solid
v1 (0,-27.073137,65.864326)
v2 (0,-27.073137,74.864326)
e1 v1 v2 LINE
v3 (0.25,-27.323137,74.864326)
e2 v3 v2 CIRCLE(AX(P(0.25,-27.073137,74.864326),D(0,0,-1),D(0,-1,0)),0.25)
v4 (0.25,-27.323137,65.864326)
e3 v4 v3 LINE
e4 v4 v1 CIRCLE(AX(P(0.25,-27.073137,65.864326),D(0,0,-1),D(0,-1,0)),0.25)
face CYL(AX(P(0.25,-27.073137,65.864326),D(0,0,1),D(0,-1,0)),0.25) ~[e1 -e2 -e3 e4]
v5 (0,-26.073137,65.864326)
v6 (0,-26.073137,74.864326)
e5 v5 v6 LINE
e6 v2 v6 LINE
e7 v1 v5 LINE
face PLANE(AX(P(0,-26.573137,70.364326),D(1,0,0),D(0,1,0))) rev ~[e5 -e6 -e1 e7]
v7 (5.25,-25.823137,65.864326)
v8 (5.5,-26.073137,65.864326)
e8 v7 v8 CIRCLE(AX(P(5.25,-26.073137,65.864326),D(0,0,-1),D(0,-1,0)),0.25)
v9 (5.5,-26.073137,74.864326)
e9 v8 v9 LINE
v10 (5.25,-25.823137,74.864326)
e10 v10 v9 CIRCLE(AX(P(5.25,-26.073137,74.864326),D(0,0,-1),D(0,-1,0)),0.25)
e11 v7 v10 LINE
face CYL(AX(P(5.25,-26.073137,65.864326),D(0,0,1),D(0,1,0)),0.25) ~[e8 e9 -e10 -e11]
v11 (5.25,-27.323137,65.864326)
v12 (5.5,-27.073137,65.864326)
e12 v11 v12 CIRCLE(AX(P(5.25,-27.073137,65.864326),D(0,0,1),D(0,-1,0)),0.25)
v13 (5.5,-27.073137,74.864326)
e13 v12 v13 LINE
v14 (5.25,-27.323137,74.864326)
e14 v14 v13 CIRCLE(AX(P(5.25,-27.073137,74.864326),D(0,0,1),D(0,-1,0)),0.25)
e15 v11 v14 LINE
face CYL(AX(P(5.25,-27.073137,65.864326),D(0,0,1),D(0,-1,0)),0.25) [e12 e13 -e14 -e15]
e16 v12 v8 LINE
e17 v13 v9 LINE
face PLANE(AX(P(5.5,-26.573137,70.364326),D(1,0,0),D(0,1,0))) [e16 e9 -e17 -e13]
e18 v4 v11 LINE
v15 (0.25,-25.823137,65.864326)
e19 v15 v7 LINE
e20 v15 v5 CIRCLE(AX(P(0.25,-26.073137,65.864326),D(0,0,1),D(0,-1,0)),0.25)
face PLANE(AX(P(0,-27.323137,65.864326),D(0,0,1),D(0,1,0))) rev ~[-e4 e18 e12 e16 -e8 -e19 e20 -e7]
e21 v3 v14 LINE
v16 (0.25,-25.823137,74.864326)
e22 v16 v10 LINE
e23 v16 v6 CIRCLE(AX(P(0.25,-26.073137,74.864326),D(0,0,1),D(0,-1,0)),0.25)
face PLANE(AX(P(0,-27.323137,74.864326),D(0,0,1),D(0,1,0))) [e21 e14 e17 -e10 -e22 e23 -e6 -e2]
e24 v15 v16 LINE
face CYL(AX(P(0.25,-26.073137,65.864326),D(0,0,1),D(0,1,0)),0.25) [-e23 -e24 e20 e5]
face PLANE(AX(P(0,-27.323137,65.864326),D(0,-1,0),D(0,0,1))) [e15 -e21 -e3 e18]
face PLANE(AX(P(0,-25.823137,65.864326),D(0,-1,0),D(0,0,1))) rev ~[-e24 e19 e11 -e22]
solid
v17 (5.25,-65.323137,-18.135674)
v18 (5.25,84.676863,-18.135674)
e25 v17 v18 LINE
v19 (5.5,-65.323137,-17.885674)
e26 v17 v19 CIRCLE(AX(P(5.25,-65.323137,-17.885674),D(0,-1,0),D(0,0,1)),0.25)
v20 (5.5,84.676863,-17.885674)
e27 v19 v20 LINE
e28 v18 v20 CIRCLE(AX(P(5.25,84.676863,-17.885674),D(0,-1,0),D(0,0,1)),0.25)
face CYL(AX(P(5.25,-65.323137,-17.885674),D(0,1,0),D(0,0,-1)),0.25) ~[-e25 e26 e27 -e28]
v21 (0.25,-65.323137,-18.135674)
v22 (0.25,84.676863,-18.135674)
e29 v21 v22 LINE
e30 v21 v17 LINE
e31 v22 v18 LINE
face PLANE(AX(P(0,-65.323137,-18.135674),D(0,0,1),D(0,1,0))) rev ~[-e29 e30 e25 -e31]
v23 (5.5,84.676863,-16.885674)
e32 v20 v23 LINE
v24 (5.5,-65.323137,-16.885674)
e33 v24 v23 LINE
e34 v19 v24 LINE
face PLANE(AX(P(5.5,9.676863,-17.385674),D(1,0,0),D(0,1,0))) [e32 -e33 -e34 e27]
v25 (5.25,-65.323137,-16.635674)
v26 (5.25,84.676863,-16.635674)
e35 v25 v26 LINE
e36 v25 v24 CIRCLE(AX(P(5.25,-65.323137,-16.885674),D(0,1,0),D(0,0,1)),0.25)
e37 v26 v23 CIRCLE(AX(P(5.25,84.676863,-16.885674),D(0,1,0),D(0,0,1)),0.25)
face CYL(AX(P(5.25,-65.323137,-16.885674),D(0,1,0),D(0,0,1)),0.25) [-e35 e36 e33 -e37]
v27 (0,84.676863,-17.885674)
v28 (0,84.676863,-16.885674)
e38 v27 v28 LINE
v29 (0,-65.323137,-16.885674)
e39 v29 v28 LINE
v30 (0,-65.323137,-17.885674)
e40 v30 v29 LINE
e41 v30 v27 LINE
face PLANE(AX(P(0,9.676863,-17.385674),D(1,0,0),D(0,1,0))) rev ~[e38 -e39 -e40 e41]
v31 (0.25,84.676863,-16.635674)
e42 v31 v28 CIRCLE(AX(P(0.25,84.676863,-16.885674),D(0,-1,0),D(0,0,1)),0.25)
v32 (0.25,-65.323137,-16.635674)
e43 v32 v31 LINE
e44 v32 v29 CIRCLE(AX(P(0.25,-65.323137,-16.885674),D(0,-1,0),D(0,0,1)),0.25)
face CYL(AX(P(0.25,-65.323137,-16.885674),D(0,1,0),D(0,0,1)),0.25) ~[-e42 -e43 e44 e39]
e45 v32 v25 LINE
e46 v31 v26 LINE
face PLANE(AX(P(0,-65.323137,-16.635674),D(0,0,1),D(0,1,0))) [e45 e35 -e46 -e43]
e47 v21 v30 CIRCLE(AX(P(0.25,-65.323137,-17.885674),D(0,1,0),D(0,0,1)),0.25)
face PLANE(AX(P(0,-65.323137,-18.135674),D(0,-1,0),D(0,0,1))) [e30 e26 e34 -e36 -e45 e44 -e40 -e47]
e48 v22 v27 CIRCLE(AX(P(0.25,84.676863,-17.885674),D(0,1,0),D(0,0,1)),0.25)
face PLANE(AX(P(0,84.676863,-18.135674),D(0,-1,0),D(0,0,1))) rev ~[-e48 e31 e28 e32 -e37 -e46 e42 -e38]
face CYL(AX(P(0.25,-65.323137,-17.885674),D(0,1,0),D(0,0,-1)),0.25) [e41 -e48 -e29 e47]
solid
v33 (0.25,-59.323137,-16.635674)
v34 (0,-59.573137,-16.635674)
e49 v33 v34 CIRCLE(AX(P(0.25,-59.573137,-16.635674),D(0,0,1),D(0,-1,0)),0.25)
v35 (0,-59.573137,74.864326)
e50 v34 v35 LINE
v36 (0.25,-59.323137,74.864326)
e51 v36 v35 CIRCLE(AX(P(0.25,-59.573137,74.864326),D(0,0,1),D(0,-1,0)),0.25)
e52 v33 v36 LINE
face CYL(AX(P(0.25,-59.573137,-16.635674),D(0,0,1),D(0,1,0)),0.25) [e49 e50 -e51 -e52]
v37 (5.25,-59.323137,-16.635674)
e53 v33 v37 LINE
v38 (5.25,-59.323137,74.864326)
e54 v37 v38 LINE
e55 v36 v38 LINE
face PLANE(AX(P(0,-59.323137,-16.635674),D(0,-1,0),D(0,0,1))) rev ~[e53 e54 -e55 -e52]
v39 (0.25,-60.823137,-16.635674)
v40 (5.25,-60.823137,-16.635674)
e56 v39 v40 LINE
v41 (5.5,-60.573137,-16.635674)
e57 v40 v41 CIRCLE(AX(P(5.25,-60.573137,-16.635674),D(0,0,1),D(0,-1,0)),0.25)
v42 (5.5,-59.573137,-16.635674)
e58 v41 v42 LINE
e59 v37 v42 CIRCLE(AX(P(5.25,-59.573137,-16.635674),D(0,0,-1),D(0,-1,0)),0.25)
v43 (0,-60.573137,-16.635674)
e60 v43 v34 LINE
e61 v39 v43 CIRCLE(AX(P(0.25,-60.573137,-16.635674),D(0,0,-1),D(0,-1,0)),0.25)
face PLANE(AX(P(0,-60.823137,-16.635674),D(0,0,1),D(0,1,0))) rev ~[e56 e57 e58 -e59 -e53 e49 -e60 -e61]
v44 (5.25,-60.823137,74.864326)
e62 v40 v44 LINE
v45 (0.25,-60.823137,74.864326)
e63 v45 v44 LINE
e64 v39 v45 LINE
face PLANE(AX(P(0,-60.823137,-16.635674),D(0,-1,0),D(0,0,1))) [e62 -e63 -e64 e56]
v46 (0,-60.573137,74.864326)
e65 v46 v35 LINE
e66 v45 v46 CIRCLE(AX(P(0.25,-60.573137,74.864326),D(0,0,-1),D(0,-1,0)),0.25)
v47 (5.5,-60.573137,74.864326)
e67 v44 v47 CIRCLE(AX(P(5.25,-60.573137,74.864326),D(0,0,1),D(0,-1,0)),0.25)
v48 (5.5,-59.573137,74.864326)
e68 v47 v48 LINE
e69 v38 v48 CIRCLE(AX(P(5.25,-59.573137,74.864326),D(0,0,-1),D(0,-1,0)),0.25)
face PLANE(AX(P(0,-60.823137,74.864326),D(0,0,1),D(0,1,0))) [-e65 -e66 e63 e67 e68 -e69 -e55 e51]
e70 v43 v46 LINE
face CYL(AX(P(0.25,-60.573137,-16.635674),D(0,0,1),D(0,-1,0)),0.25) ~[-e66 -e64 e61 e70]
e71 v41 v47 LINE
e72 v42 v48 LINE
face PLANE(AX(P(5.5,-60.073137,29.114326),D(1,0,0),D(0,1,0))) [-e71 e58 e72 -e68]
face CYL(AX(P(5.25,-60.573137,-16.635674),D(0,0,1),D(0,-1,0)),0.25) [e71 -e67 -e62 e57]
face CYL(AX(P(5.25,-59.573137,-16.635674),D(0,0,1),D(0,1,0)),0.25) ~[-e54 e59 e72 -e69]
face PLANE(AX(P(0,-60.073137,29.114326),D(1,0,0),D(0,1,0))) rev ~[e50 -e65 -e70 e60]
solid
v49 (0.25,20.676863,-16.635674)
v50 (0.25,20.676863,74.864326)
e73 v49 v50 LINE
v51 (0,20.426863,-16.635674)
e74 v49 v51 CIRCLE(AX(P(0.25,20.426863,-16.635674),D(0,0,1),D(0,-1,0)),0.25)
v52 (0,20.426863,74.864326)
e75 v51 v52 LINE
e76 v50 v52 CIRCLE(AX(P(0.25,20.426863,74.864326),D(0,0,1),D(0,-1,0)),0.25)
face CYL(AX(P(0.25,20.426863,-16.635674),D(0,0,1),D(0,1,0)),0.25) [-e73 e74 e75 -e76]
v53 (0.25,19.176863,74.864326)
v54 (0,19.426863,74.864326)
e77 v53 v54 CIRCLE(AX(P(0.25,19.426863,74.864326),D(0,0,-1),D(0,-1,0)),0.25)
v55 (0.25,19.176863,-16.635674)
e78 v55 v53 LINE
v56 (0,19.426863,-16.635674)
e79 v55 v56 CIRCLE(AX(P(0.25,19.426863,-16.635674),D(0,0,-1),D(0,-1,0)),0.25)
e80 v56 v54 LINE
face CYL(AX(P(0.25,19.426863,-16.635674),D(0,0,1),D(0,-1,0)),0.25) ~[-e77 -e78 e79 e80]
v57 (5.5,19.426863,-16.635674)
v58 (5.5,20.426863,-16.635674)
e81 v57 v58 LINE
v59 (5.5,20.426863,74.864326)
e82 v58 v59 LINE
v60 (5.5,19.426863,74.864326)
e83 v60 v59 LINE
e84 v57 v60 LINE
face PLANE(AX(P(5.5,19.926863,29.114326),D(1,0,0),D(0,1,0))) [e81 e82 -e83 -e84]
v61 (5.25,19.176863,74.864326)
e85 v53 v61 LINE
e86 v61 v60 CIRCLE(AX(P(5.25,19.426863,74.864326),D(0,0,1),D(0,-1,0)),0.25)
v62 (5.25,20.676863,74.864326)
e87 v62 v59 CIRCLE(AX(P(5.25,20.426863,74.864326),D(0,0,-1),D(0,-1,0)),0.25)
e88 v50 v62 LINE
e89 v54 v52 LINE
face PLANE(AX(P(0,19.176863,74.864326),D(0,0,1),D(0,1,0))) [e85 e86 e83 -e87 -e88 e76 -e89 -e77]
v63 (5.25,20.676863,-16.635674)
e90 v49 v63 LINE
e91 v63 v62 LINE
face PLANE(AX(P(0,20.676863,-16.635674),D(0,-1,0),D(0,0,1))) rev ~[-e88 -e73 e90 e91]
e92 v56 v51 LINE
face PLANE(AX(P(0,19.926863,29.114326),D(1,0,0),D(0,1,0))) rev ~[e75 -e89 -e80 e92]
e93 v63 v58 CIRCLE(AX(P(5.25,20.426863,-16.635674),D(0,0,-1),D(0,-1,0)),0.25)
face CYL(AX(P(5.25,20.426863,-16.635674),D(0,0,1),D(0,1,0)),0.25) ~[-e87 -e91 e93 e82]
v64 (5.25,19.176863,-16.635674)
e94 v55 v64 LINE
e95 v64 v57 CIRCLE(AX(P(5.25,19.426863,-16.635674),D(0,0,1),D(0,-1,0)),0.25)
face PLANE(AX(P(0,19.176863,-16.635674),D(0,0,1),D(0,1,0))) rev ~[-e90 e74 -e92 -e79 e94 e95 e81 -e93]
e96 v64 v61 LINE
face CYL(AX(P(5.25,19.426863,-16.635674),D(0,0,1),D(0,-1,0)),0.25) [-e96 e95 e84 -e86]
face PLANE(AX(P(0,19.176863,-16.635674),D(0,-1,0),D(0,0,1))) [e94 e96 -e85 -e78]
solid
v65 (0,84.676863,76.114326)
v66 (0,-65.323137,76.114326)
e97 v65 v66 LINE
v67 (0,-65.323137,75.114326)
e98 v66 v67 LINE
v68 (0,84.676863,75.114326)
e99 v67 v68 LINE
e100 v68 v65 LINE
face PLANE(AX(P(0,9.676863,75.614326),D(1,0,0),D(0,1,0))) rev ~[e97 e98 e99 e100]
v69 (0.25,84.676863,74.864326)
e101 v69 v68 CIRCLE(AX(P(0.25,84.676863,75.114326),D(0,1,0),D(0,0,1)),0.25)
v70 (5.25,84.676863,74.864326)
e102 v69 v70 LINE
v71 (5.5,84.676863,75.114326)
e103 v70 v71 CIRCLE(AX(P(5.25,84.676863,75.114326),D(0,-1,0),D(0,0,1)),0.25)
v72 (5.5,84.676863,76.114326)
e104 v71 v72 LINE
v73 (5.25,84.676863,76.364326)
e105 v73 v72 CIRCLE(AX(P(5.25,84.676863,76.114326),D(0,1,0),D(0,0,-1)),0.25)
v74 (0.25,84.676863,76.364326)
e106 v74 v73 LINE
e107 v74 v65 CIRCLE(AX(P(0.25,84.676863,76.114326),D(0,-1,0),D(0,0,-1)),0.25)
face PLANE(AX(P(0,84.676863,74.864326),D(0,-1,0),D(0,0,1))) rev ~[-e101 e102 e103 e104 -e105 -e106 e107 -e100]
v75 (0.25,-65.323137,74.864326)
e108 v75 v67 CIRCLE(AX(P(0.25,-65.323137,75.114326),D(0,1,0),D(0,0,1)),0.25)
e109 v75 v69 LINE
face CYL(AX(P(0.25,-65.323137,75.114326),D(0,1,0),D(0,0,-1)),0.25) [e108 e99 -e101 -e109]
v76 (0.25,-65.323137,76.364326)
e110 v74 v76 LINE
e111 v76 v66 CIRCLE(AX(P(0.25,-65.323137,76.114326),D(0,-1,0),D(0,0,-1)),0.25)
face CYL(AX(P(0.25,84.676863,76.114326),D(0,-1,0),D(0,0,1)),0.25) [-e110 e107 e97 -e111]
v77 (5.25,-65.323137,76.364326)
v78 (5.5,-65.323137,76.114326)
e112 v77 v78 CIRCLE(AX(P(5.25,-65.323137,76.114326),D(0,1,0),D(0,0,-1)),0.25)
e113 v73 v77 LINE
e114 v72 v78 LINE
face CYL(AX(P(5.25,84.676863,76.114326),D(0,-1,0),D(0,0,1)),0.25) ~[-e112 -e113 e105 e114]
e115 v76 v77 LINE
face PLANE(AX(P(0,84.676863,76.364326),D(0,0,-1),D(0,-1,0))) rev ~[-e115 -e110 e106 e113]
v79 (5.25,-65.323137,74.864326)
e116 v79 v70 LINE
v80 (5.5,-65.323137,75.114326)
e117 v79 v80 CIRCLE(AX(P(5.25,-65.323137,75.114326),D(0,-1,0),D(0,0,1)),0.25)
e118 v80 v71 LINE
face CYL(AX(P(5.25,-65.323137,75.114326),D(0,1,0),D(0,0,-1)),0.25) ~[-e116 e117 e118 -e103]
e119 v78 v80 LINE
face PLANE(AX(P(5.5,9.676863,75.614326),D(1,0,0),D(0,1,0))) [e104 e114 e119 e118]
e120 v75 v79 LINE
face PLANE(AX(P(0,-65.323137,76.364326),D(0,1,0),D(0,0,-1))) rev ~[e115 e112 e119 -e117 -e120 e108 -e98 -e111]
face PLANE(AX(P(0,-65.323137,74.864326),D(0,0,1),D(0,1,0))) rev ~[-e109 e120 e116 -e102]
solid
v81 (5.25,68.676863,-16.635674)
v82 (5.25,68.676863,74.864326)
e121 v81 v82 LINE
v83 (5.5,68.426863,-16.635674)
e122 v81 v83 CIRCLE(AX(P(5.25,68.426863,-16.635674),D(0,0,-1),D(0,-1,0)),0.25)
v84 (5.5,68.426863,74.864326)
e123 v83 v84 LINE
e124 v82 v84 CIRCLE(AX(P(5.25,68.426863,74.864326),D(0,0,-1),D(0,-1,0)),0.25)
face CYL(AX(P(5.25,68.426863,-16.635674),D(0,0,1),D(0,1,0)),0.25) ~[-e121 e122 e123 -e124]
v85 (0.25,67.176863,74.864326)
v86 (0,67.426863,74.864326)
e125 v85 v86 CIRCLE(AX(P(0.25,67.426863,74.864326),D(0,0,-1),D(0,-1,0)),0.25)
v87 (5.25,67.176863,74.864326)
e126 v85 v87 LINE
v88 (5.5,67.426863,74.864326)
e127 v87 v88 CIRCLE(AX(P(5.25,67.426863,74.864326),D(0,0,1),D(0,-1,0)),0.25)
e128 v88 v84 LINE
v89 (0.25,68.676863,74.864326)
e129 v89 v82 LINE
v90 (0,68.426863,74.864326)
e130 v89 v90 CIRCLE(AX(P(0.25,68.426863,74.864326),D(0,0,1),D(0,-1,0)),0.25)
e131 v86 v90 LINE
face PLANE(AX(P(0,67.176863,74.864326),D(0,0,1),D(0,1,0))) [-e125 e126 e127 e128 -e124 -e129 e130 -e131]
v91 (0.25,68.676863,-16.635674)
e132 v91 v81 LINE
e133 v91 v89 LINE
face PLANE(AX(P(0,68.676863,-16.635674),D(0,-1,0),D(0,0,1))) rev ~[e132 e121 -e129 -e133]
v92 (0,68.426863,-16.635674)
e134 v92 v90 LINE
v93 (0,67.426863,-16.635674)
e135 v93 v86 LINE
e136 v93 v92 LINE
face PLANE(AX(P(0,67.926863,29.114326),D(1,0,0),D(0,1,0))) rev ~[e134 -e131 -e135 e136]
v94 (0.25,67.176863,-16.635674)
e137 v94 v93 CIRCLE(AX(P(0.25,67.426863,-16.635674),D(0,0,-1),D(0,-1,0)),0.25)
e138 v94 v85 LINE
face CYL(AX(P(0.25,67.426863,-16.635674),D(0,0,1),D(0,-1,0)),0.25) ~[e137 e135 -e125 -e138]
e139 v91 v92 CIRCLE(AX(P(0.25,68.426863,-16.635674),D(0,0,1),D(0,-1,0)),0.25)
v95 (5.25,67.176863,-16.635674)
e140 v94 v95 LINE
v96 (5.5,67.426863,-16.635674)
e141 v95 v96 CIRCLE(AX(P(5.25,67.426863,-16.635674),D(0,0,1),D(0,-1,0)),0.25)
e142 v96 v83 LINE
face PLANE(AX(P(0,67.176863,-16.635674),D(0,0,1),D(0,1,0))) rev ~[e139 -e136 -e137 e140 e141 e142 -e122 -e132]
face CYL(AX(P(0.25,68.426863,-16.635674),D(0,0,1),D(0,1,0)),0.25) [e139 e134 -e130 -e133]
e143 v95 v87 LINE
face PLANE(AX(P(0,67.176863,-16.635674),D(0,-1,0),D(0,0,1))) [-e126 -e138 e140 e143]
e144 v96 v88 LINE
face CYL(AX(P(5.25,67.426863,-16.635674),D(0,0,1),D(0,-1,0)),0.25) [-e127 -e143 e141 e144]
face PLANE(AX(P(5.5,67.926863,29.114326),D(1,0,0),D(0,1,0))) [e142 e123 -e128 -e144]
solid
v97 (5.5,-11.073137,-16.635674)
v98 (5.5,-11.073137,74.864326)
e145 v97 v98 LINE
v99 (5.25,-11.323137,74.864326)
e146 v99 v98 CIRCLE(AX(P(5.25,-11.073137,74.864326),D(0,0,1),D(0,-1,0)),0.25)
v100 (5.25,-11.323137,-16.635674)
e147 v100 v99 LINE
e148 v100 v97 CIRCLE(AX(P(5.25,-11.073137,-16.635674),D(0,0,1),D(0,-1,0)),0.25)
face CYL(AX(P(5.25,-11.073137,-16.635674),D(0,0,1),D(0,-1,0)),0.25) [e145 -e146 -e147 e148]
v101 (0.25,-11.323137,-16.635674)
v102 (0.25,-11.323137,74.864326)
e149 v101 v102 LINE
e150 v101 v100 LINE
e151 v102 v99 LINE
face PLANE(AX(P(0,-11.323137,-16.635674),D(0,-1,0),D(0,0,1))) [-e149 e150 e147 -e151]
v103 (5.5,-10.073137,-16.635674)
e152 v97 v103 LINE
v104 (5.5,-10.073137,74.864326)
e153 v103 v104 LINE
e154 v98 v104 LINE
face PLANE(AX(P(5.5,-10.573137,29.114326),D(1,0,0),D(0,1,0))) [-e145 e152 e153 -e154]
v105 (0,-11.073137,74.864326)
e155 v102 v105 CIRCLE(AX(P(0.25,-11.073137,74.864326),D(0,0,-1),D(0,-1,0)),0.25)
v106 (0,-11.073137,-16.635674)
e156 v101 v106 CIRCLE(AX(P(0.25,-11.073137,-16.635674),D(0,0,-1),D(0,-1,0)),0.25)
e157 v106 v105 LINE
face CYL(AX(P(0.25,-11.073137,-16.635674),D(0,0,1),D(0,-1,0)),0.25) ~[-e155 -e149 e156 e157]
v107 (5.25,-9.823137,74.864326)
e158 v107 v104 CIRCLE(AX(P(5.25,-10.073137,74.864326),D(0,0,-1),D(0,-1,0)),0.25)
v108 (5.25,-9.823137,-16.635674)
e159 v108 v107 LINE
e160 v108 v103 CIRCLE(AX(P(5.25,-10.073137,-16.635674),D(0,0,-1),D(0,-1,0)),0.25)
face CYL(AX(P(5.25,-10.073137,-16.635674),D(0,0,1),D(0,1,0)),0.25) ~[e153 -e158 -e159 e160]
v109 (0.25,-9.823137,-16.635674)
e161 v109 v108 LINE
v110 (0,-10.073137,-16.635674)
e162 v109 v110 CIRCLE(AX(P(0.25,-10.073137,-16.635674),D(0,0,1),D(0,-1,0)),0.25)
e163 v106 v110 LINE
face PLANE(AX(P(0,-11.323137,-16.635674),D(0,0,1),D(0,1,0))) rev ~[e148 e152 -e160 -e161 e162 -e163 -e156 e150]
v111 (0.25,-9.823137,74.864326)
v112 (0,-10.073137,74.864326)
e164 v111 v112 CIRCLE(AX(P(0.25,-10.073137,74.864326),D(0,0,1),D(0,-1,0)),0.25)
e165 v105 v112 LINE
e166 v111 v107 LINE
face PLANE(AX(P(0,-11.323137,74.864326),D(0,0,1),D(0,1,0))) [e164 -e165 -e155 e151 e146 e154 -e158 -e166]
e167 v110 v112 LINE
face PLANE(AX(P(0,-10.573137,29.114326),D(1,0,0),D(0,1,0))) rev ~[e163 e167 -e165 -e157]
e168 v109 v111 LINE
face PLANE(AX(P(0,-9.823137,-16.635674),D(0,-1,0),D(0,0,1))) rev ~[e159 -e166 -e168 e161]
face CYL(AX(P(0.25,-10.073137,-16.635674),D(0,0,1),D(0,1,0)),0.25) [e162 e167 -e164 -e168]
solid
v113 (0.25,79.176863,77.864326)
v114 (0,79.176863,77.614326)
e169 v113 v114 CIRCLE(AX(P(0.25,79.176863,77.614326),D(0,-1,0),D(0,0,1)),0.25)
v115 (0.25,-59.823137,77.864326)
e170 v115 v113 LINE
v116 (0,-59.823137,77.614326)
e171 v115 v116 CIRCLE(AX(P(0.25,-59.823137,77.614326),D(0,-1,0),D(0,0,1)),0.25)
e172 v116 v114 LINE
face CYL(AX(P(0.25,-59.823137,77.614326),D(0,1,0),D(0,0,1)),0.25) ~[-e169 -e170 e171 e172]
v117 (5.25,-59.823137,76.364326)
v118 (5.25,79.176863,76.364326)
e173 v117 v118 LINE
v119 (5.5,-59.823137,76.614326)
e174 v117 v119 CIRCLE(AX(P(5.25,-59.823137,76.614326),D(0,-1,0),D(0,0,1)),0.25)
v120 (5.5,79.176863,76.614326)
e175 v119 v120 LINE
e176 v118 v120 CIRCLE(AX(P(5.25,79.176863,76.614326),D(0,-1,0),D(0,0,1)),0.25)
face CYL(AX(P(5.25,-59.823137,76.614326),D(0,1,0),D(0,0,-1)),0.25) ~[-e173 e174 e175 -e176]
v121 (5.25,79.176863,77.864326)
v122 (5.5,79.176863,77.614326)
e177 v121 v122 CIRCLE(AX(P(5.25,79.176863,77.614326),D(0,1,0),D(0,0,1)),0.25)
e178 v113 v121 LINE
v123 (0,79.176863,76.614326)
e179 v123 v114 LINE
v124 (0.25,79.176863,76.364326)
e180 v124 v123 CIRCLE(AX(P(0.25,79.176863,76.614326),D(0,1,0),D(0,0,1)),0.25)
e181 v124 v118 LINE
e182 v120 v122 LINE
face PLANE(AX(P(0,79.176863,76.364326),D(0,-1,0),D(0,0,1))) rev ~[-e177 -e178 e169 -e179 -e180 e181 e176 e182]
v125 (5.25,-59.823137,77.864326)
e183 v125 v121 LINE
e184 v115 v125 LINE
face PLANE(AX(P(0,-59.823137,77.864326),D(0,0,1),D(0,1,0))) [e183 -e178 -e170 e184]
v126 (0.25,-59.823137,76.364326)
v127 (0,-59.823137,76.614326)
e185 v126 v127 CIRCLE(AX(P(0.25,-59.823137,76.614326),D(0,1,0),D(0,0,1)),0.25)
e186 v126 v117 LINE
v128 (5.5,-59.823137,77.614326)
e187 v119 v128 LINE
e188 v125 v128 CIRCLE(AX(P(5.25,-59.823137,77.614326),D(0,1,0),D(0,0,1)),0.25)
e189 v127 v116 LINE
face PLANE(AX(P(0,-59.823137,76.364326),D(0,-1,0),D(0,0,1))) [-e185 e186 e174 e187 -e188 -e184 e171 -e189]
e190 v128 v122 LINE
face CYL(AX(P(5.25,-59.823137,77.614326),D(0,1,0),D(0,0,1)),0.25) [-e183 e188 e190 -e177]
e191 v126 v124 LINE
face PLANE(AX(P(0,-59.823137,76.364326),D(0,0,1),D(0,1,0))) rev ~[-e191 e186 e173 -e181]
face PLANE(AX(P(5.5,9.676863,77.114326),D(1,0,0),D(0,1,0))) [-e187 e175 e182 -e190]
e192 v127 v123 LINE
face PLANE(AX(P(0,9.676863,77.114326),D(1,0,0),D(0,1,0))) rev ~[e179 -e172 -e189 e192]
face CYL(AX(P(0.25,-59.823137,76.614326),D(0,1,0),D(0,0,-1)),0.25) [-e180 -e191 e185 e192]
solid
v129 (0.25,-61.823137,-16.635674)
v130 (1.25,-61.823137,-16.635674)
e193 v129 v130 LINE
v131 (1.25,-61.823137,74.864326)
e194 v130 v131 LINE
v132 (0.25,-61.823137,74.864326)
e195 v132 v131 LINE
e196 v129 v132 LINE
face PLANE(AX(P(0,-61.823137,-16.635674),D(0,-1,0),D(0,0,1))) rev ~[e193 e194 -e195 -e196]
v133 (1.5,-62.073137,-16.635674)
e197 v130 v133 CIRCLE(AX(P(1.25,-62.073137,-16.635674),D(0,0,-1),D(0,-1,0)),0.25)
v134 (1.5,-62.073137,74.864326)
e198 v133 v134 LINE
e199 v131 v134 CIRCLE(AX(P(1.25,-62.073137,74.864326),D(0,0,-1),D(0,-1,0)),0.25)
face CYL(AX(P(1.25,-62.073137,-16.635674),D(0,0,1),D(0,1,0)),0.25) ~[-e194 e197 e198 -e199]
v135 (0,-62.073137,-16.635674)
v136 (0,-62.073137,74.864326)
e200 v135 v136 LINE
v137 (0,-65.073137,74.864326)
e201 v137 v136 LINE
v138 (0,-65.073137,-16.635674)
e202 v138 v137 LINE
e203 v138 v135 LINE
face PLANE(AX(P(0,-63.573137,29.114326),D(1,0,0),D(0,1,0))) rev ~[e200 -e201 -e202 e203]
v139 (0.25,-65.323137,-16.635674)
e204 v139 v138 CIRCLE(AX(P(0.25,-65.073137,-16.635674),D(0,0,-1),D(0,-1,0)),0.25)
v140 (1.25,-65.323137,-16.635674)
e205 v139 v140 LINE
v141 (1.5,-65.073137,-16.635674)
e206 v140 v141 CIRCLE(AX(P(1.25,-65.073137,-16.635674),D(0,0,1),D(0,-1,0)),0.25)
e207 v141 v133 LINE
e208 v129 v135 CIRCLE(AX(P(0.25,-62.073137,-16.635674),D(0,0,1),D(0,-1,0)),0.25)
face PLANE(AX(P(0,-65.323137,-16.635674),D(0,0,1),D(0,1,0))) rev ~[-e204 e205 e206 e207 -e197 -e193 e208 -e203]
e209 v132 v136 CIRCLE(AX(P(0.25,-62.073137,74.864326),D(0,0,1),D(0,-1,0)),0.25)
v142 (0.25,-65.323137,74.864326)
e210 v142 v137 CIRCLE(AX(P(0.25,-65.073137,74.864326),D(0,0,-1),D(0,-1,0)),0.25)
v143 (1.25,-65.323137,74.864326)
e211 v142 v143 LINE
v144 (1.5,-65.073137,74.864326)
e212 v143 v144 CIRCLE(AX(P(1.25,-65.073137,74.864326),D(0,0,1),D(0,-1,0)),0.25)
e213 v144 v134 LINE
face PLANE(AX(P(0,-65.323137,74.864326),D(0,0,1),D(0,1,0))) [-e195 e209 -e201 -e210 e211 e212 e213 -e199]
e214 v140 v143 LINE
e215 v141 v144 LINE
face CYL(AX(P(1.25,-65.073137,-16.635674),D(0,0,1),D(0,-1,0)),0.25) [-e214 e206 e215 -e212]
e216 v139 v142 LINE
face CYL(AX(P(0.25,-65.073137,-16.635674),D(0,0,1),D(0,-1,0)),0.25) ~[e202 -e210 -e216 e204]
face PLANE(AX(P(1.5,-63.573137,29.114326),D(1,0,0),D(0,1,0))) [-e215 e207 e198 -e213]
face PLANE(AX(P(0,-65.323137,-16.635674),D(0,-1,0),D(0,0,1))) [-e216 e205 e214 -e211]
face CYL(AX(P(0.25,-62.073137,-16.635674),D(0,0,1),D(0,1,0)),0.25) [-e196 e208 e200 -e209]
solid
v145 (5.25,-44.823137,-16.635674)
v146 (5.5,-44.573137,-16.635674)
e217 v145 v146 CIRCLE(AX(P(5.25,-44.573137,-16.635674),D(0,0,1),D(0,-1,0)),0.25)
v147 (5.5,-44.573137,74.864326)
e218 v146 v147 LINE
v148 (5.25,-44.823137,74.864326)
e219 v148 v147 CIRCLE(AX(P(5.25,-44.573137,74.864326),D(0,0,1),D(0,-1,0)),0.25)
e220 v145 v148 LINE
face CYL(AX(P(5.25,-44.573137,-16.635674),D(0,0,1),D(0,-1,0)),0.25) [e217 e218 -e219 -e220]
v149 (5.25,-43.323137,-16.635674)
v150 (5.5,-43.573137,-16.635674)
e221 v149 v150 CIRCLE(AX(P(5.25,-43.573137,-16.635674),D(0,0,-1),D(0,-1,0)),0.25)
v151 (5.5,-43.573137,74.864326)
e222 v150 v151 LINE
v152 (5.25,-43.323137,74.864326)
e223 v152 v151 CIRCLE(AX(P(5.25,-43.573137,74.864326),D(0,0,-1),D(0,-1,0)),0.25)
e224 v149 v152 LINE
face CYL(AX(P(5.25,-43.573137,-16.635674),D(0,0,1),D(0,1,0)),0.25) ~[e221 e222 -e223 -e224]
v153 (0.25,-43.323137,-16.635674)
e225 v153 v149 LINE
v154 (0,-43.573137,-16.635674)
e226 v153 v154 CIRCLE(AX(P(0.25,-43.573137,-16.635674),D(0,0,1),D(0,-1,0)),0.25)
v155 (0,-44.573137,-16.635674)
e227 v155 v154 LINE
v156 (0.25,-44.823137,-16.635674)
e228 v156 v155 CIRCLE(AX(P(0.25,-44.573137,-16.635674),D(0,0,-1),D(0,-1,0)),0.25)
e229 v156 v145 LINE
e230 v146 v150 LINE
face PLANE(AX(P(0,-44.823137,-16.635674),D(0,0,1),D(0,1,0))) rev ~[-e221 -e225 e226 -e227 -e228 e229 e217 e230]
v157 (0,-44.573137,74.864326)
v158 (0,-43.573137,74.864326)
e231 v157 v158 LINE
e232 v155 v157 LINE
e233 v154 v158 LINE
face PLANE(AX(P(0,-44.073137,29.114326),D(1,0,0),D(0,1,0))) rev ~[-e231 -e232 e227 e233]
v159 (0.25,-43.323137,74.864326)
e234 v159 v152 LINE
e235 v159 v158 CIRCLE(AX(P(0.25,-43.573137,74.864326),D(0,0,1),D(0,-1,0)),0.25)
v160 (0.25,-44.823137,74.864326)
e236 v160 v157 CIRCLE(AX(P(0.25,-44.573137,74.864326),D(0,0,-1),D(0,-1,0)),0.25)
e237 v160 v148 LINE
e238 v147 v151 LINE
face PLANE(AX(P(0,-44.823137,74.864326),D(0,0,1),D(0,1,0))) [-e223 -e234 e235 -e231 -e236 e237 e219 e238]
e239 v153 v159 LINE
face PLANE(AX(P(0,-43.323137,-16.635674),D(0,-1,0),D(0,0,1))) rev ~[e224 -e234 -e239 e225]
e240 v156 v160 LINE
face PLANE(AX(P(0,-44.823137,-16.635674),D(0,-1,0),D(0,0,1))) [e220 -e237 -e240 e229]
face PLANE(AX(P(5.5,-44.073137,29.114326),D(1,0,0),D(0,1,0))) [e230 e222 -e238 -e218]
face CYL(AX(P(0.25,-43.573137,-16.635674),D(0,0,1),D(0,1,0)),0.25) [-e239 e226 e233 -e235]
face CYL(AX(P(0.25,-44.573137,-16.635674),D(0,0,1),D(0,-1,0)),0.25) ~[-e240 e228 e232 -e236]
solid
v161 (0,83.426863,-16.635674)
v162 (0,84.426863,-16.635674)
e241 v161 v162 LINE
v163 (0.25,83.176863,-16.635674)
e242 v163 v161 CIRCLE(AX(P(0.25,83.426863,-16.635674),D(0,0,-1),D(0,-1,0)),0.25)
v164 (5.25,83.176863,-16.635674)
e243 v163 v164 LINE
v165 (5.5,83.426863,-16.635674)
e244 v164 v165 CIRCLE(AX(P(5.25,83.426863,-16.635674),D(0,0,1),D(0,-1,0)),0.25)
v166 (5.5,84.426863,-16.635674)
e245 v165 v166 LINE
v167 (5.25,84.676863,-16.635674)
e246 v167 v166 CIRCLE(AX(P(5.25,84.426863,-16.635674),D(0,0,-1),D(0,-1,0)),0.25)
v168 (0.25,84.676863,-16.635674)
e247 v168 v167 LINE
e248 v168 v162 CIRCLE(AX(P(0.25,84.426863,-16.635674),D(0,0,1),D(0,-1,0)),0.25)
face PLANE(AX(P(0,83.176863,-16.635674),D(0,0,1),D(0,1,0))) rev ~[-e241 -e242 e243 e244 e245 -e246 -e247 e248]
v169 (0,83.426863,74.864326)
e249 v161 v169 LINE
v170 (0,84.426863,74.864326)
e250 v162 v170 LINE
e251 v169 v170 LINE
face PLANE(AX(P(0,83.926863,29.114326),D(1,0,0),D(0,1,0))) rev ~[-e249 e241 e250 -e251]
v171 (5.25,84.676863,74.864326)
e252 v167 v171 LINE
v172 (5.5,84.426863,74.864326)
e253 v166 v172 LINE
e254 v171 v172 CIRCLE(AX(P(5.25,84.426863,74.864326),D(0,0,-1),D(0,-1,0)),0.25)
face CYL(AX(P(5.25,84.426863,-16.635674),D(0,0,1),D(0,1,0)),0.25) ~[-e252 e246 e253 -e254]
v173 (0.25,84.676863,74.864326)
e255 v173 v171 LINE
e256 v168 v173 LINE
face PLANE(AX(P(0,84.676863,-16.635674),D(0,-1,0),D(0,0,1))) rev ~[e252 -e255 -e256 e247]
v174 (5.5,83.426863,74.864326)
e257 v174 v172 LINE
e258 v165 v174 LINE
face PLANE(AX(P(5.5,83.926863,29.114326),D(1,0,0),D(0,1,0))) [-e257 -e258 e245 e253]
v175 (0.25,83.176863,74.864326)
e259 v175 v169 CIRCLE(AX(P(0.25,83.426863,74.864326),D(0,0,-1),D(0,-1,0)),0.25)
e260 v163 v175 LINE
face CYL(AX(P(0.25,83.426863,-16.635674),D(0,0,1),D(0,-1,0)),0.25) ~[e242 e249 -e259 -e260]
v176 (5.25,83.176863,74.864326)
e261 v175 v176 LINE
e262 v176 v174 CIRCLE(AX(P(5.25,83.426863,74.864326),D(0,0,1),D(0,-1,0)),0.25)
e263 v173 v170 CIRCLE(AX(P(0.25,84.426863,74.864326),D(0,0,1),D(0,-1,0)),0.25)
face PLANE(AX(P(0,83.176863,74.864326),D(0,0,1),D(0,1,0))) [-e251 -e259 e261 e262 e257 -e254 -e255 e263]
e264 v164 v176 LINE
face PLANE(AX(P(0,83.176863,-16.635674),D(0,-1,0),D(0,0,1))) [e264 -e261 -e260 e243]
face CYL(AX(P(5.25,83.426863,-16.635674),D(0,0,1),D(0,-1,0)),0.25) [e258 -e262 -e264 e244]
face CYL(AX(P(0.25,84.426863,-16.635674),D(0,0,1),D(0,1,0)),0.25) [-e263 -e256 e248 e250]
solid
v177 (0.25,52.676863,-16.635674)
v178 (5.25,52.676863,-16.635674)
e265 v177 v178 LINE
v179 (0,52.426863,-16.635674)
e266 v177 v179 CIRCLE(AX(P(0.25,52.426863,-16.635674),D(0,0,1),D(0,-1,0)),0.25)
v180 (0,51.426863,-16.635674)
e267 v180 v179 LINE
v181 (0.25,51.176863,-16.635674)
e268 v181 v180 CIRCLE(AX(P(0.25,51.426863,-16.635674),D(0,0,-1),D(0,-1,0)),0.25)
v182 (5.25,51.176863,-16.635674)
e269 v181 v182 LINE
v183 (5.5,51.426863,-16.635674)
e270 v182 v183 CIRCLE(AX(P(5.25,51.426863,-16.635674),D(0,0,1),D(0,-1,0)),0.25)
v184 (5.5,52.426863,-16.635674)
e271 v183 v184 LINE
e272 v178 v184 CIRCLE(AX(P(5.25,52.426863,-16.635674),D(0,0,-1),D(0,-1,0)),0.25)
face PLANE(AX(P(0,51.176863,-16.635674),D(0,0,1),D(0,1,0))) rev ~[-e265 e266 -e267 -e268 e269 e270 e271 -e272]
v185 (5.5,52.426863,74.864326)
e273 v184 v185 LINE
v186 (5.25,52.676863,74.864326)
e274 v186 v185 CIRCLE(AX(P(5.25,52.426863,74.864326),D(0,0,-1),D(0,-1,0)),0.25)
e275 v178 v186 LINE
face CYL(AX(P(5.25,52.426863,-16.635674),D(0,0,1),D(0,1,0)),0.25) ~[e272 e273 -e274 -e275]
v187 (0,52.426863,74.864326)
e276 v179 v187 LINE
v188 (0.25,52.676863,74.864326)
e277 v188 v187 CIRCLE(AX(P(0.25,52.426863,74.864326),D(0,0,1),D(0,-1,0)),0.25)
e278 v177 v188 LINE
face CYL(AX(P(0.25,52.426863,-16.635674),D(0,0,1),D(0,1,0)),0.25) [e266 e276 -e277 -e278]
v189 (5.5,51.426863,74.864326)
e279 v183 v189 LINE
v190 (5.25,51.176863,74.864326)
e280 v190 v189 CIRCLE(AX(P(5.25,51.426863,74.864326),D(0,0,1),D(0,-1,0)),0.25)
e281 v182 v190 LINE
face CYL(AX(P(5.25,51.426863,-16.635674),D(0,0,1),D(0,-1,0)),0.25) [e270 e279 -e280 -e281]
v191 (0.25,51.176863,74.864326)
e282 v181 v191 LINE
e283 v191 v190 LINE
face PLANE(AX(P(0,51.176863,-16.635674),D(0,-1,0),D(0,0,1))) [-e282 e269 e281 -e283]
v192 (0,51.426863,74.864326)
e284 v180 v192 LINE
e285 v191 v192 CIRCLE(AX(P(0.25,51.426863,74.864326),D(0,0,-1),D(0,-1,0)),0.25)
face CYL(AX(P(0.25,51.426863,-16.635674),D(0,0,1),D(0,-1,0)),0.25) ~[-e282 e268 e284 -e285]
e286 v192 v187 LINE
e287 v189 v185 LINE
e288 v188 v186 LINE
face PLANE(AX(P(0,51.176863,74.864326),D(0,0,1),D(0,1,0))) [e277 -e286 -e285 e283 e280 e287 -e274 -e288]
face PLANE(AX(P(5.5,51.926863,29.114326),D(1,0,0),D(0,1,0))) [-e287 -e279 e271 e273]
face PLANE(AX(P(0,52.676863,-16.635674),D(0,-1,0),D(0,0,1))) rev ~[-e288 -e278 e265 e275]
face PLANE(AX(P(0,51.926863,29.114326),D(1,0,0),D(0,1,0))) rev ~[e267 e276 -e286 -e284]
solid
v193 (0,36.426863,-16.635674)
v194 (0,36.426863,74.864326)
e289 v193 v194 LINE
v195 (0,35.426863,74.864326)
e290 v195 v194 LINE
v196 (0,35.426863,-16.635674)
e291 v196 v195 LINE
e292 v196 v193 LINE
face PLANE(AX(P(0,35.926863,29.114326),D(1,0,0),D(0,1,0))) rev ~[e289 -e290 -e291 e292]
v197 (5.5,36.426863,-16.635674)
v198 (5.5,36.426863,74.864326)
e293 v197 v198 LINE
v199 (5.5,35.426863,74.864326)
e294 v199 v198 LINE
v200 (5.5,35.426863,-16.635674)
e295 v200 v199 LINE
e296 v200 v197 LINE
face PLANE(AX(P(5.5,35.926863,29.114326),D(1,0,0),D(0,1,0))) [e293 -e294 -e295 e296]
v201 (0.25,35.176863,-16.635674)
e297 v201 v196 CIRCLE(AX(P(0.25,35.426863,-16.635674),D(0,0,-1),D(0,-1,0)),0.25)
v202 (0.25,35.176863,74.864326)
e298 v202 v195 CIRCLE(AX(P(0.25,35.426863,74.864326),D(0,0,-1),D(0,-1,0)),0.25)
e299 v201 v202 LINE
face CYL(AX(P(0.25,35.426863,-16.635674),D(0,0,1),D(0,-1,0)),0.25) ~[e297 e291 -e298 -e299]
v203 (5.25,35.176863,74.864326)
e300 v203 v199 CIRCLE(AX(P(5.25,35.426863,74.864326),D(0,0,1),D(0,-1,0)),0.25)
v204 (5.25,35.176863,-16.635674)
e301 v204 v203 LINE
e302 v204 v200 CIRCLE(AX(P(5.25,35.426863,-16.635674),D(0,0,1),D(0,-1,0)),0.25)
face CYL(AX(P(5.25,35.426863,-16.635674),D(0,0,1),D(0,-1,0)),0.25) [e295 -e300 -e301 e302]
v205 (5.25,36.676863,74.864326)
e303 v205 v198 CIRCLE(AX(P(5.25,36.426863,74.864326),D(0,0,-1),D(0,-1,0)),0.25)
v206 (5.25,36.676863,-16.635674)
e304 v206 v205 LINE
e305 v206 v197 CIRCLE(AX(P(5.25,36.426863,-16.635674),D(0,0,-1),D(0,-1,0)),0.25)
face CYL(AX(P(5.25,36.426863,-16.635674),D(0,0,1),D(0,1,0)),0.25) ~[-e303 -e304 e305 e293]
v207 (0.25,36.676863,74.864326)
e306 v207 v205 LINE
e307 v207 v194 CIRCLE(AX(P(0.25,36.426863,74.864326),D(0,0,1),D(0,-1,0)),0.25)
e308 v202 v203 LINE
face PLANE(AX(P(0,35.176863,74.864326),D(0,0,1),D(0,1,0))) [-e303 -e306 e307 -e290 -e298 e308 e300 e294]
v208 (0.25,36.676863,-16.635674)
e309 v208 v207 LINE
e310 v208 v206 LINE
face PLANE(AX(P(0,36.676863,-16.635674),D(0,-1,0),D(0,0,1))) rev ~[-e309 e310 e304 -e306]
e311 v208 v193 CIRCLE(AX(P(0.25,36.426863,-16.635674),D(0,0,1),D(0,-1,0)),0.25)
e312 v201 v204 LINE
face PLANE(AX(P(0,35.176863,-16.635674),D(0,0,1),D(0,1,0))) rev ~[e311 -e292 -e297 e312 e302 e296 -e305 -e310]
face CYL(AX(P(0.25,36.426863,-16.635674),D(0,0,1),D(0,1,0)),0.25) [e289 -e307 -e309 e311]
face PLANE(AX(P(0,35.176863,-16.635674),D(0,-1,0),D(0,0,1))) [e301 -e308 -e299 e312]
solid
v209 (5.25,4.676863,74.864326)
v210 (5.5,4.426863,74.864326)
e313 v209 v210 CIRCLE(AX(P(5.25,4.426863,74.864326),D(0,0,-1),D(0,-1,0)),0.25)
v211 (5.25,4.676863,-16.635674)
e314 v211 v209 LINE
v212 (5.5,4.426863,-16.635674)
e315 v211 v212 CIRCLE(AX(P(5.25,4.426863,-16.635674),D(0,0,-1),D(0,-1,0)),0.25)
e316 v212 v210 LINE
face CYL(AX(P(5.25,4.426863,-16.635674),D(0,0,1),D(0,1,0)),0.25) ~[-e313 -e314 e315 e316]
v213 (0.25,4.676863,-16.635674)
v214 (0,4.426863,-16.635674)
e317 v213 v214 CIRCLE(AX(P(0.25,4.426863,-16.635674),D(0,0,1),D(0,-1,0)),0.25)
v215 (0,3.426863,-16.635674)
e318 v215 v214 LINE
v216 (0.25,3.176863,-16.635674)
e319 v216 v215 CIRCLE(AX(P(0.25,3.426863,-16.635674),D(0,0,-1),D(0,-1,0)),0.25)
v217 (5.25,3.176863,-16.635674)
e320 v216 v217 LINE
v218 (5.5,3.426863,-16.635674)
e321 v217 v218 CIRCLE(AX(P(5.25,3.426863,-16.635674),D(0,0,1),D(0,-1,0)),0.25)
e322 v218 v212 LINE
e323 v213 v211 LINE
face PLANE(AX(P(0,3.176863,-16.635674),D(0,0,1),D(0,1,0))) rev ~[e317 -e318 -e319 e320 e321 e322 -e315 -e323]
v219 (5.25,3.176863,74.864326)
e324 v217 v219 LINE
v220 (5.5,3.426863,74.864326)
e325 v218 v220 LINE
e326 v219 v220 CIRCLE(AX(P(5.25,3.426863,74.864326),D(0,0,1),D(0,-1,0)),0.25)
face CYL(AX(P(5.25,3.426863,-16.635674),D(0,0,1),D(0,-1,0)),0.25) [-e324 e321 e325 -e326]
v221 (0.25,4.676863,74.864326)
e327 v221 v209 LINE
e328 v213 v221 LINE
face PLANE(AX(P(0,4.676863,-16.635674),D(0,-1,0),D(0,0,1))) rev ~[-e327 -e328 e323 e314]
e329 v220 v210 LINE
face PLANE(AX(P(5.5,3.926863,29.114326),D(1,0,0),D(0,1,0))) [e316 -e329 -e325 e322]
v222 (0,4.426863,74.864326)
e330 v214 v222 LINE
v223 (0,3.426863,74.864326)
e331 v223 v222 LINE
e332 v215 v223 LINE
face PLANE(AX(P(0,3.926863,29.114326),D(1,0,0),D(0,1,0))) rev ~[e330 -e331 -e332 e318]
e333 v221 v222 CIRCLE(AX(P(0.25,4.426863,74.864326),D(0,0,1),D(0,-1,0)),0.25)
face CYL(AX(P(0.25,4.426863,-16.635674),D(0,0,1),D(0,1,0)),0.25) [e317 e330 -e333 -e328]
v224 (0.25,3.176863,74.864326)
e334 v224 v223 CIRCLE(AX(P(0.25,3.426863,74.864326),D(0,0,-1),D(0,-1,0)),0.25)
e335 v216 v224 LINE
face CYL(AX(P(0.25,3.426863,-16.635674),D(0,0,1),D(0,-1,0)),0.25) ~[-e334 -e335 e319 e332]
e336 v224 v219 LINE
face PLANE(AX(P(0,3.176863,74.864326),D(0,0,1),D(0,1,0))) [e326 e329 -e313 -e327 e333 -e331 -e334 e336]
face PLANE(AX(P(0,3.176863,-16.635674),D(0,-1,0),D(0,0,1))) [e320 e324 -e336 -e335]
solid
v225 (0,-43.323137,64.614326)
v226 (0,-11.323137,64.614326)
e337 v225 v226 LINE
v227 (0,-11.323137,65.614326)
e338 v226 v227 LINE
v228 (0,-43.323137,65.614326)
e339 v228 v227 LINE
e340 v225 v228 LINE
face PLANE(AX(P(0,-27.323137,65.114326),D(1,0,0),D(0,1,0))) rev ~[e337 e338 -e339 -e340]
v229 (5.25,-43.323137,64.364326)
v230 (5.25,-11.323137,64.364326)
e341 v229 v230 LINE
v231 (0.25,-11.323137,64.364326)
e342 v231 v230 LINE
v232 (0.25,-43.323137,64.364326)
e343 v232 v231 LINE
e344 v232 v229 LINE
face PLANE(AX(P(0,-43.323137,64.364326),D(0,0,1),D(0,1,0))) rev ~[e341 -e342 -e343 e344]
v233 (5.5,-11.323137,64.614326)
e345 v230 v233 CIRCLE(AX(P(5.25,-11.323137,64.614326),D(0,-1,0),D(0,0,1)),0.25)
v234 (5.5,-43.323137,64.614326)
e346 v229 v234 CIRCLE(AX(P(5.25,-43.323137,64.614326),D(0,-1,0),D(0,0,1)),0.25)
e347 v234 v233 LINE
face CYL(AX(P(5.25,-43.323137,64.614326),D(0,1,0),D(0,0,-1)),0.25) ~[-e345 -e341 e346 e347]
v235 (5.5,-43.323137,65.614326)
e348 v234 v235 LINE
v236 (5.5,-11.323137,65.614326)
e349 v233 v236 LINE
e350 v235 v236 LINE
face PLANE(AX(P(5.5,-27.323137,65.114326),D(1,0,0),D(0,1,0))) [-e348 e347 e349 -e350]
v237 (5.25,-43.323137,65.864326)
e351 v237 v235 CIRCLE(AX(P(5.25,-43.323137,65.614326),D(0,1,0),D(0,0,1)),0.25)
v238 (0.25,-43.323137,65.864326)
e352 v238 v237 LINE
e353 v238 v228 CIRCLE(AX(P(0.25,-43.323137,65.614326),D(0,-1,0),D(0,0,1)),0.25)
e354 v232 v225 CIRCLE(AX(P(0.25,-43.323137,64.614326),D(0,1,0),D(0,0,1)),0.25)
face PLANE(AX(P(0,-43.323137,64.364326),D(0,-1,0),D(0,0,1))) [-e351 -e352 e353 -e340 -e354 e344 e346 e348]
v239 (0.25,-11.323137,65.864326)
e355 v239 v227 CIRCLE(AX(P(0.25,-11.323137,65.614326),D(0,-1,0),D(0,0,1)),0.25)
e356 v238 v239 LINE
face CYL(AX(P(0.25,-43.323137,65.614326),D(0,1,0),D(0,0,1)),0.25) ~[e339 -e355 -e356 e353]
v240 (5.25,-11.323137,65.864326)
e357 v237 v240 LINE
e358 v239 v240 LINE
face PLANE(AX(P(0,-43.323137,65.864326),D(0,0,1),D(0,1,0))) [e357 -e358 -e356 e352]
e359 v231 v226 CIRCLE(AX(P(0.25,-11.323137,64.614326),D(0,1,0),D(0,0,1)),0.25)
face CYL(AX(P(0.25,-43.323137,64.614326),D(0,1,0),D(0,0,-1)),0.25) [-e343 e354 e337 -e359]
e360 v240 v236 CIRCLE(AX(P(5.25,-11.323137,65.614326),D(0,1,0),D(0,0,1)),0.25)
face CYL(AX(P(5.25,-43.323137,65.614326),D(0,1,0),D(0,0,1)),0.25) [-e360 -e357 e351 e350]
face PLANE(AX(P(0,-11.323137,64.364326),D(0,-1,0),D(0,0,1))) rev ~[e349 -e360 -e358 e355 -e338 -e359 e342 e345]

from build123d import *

# Parameters (mm, degrees)
F0_W      = 150
F0_H      = 1.5
F1_DEPTH  = 5.5
F2_W      = 1.5
F2_H      = 91.5
F3_DEPTH  = 5.5
F4_W      = 32
F4_H      = 1.5
F5_DEPTH  = 5.5
F6_W      = 139
F6_H      = 1.5
F6_W_2    = 1.5
F6_H_2    = 9
F7_DEPTH  = 5.5
F8_R      = 0.25
F8_2_R    = 0.25
F8_3_R    = 0.25
F8_4_R    = 0.25
F8_5_R    = 0.25
F8_6_R    = 0.25
F8_7_R    = 0.25
F8_8_R    = 0.25
F8_9_R    = 0.25
F8_10_R   = 0.25
F8_11_R   = 0.25
F8_12_R   = 0.25
F9_W      = 3.5
F9_H      = 91.5
F10_DEPTH = 1.5
F11_R     = 0.25


# Not quite as in the source:
# - a feature names something its author has since deleted; it is built from what else it names


with BuildPart() as f1:
    # F0 (on Right) → F1 (new body)
    with BuildSketch(Plane.YZ):
        with Locations((9.6768632531, -17.3856742978)):
            Rectangle(F0_W, F0_H)
    extrude(amount=F1_DEPTH)

    # F8#12
    f8_12_edges = [f1.edges().sort_by_distance(p)[0] for p in [
        (0, 9.676863, -18.135674),
        (0, 9.676863, -16.635674),
        (5.5, 9.676863, -16.635674),
        (5.5, 9.676863, -18.135674),
    ]]
    fillet(f8_12_edges, radius=F8_12_R)


with BuildPart() as f3:
    # F2 (on Right) → F3 (new body)
    with BuildSketch(Plane.YZ):
        with Locations((83.9268632531, 29.1143257022)):
            Rectangle(F2_W, F2_H)
    extrude(amount=F3_DEPTH)

    # F8#6
    f8_6_edges = [f3.edges().sort_by_distance(p)[0] for p in [
        (5.5, 84.676863, 29.114326),
        (0, 84.676863, 29.114326),
        (0, 83.176863, 29.114326),
        (5.5, 83.176863, 29.114326),
    ]]
    fillet(f8_6_edges, radius=F8_6_R)


with BuildPart() as f3b:
    # F2 (on Right) → F3, piece 2 (new body)
    with BuildSketch(Plane.YZ):
        with Locations((67.9268632531, 29.1143257022)):
            Rectangle(F2_W, F2_H)
    extrude(amount=F3_DEPTH)

    # F8#3
    f8_3_edges = [f3b.edges().sort_by_distance(p)[0] for p in [
        (0, 67.176863, 29.114326),
        (0, 68.676863, 29.114326),
        (5.5, 68.676863, 29.114326),
        (5.5, 67.176863, 29.114326),
    ]]
    fillet(f8_3_edges, radius=F8_3_R)


with BuildPart() as f3c:
    # F2 (on Right) → F3, piece 3 (new body)
    with BuildSketch(Plane.YZ):
        with Locations((51.9268632531, 29.1143257022)):
            Rectangle(F2_W, F2_H)
    extrude(amount=F3_DEPTH)

    # F8#5
    f8_5_edges = [f3c.edges().sort_by_distance(p)[0] for p in [
        (0, 51.176863, 29.114326),
        (5.5, 52.676863, 29.114326),
        (0, 52.676863, 29.114326),
        (5.5, 51.176863, 29.114326),
    ]]
    fillet(f8_5_edges, radius=F8_5_R)


with BuildPart() as f3d:
    # F2 (on Right) → F3, piece 4 (new body)
    with BuildSketch(Plane.YZ):
        with Locations((35.9268632531, 29.1143257022)):
            Rectangle(F2_W, F2_H)
    extrude(amount=F3_DEPTH)

    # F8#4
    f8_4_edges = [f3d.edges().sort_by_distance(p)[0] for p in [
        (0, 35.176863, 29.114326),
        (5.5, 36.676863, 29.114326),
        (0, 36.676863, 29.114326),
        (5.5, 35.176863, 29.114326),
    ]]
    fillet(f8_4_edges, radius=F8_4_R)


with BuildPart() as f3e:
    # F2 (on Right) → F3, piece 5 (new body)
    with BuildSketch(Plane.YZ):
        with Locations((19.9268632531, 29.1143257022)):
            Rectangle(F2_W, F2_H)
    extrude(amount=F3_DEPTH)

    # F8
    f8_edges = [f3e.edges().sort_by_distance(p)[0] for p in [
        (0, 20.676863, 29.114326),
        (5.5, 20.676863, 29.114326),
        (0, 19.176863, 29.114326),
        (5.5, 19.176863, 29.114326),
    ]]
    fillet(f8_edges, radius=F8_R)


with BuildPart() as f3f:
    # F2 (on Right) → F3, piece 6 (new body)
    with BuildSketch(Plane.YZ):
        with Locations((3.9268632531, 29.1143257022)):
            Rectangle(F2_W, F2_H)
    extrude(amount=F3_DEPTH)

    # F8#2
    f8_2_edges = [f3f.edges().sort_by_distance(p)[0] for p in [
        (0, 3.176863, 29.114326),
        (5.5, 4.676863, 29.114326),
        (5.5, 3.176863, 29.114326),
        (0, 4.676863, 29.114326),
    ]]
    fillet(f8_2_edges, radius=F8_2_R)


with BuildPart() as f3g:
    # F2 (on Right) → F3, piece 7 (new body)
    with BuildSketch(Plane.YZ):
        with Locations((-10.5731367469, 29.1143257022)):
            Rectangle(F2_W, F2_H)
    extrude(amount=F3_DEPTH)

    # F8#9
    f8_9_edges = [f3g.edges().sort_by_distance(p)[0] for p in [
        (5.5, -11.323137, 29.114326),
        (0, -9.823137, 29.114326),
        (5.5, -9.823137, 29.114326),
        (0, -11.323137, 29.114326),
    ]]
    fillet(f8_9_edges, radius=F8_9_R)


with BuildPart() as f3h:
    # F2 (on Right) → F3, piece 8 (new body)
    with BuildSketch(Plane.YZ):
        with Locations((-44.0731367469, 29.1143257022)):
            Rectangle(F2_W, F2_H)
    extrude(amount=F3_DEPTH)

    # F8#7
    f8_7_edges = [f3h.edges().sort_by_distance(p)[0] for p in [
        (5.5, -43.323137, 29.114326),
        (0, -44.823137, 29.114326),
        (0, -43.323137, 29.114326),
        (5.5, -44.823137, 29.114326),
    ]]
    fillet(f8_7_edges, radius=F8_7_R)


with BuildPart() as f3i:
    # F2 (on Right) → F3, piece 9 (new body)
    with BuildSketch(Plane.YZ):
        with Locations((-60.0731367469, 29.1143257022)):
            Rectangle(F2_W, F2_H)
    extrude(amount=F3_DEPTH)

    # F8#8
    f8_8_edges = [f3i.edges().sort_by_distance(p)[0] for p in [
        (0, -59.323137, 29.114326),
        (5.5, -60.823137, 29.114326),
        (0, -60.823137, 29.114326),
        (5.5, -59.323137, 29.114326),
    ]]
    fillet(f8_8_edges, radius=F8_8_R)


with BuildPart() as f5:
    # F4 (on Right) → F5 (new body)
    with BuildSketch(Plane.YZ):
        Polygon((-65.3231367469, 74.8643257022), (84.6768632531, 74.8643257022), (84.6768632531, 76.3643257022), (79.1768632531, 76.3643257022), (-59.8231367469, 76.3643257022), (-65.3231367469, 76.3643257022), align=None)
        with Locations((-27.3231367469, 65.1143257022)):
            Rectangle(F4_W, F4_H)
    extrude(amount=F5_DEPTH)

    # F8#10
    f8_10_edges = [f5.edges().sort_by_distance(p)[0] for p in [
        (5.5, -27.323137, 65.864326),
        (0, -27.323137, 64.364326),
        (5.5, -27.323137, 64.364326),
        (0, -27.323137, 65.864326),
        (5.5, 9.676863, 74.864326),
        (0, 9.676863, 76.364326),
        (5.5, 9.676863, 76.364326),
        (0, 9.676863, 74.864326),
    ]]
    fillet(f8_10_edges, radius=F8_10_R)


with BuildPart() as f7:
    # F6 (on Right) → F7 (new body)
    with BuildSketch(Plane.YZ):
        with Locations((9.6768632531, 77.1143257022)):
            Rectangle(F6_W, F6_H)
        with Locations((-26.5731367469, 70.3643257022)):
            Rectangle(F6_W_2, F6_H_2)
    extrude(amount=F7_DEPTH)

    # F8#11
    f8_11_edges = [f7.edges().sort_by_distance(p)[0] for p in [
        (0, 9.676863, 77.864326),
        (5.5, 9.676863, 77.864326),
        (0, 9.676863, 76.364326),
        (5.5, 9.676863, 76.364326),
        (5.5, -25.823137, 70.364326),
        (5.5, -27.323137, 70.364326),
        (0, -27.323137, 70.364326),
        (0, -25.823137, 70.364326),
    ]]
    fillet(f8_11_edges, radius=F8_11_R)


with BuildPart() as f10:
    # F9 (on Right) → F10 (new body)
    with BuildSketch(Plane.YZ):
        with Locations((-63.5731367469, 29.1143257022)):
            Rectangle(F9_W, F9_H)
    extrude(amount=F10_DEPTH)

    # F11
    f11_edges = [f10.edges().sort_by_distance(p)[0] for p in [
        (0, -61.823137, 29.114326),
        (0, -65.323137, 29.114326),
        (1.5, -61.823137, 29.114326),
        (1.5, -65.323137, 29.114326),
    ]]
    fillet(f11_edges, radius=F11_R)


solid = Compound([f1.part, f3.part, f3b.part, f3c.part, f3d.part, f3e.part, f3f.part, f3g.part, f3h.part, f3i.part, f5.part, f7.part, f10.part])
